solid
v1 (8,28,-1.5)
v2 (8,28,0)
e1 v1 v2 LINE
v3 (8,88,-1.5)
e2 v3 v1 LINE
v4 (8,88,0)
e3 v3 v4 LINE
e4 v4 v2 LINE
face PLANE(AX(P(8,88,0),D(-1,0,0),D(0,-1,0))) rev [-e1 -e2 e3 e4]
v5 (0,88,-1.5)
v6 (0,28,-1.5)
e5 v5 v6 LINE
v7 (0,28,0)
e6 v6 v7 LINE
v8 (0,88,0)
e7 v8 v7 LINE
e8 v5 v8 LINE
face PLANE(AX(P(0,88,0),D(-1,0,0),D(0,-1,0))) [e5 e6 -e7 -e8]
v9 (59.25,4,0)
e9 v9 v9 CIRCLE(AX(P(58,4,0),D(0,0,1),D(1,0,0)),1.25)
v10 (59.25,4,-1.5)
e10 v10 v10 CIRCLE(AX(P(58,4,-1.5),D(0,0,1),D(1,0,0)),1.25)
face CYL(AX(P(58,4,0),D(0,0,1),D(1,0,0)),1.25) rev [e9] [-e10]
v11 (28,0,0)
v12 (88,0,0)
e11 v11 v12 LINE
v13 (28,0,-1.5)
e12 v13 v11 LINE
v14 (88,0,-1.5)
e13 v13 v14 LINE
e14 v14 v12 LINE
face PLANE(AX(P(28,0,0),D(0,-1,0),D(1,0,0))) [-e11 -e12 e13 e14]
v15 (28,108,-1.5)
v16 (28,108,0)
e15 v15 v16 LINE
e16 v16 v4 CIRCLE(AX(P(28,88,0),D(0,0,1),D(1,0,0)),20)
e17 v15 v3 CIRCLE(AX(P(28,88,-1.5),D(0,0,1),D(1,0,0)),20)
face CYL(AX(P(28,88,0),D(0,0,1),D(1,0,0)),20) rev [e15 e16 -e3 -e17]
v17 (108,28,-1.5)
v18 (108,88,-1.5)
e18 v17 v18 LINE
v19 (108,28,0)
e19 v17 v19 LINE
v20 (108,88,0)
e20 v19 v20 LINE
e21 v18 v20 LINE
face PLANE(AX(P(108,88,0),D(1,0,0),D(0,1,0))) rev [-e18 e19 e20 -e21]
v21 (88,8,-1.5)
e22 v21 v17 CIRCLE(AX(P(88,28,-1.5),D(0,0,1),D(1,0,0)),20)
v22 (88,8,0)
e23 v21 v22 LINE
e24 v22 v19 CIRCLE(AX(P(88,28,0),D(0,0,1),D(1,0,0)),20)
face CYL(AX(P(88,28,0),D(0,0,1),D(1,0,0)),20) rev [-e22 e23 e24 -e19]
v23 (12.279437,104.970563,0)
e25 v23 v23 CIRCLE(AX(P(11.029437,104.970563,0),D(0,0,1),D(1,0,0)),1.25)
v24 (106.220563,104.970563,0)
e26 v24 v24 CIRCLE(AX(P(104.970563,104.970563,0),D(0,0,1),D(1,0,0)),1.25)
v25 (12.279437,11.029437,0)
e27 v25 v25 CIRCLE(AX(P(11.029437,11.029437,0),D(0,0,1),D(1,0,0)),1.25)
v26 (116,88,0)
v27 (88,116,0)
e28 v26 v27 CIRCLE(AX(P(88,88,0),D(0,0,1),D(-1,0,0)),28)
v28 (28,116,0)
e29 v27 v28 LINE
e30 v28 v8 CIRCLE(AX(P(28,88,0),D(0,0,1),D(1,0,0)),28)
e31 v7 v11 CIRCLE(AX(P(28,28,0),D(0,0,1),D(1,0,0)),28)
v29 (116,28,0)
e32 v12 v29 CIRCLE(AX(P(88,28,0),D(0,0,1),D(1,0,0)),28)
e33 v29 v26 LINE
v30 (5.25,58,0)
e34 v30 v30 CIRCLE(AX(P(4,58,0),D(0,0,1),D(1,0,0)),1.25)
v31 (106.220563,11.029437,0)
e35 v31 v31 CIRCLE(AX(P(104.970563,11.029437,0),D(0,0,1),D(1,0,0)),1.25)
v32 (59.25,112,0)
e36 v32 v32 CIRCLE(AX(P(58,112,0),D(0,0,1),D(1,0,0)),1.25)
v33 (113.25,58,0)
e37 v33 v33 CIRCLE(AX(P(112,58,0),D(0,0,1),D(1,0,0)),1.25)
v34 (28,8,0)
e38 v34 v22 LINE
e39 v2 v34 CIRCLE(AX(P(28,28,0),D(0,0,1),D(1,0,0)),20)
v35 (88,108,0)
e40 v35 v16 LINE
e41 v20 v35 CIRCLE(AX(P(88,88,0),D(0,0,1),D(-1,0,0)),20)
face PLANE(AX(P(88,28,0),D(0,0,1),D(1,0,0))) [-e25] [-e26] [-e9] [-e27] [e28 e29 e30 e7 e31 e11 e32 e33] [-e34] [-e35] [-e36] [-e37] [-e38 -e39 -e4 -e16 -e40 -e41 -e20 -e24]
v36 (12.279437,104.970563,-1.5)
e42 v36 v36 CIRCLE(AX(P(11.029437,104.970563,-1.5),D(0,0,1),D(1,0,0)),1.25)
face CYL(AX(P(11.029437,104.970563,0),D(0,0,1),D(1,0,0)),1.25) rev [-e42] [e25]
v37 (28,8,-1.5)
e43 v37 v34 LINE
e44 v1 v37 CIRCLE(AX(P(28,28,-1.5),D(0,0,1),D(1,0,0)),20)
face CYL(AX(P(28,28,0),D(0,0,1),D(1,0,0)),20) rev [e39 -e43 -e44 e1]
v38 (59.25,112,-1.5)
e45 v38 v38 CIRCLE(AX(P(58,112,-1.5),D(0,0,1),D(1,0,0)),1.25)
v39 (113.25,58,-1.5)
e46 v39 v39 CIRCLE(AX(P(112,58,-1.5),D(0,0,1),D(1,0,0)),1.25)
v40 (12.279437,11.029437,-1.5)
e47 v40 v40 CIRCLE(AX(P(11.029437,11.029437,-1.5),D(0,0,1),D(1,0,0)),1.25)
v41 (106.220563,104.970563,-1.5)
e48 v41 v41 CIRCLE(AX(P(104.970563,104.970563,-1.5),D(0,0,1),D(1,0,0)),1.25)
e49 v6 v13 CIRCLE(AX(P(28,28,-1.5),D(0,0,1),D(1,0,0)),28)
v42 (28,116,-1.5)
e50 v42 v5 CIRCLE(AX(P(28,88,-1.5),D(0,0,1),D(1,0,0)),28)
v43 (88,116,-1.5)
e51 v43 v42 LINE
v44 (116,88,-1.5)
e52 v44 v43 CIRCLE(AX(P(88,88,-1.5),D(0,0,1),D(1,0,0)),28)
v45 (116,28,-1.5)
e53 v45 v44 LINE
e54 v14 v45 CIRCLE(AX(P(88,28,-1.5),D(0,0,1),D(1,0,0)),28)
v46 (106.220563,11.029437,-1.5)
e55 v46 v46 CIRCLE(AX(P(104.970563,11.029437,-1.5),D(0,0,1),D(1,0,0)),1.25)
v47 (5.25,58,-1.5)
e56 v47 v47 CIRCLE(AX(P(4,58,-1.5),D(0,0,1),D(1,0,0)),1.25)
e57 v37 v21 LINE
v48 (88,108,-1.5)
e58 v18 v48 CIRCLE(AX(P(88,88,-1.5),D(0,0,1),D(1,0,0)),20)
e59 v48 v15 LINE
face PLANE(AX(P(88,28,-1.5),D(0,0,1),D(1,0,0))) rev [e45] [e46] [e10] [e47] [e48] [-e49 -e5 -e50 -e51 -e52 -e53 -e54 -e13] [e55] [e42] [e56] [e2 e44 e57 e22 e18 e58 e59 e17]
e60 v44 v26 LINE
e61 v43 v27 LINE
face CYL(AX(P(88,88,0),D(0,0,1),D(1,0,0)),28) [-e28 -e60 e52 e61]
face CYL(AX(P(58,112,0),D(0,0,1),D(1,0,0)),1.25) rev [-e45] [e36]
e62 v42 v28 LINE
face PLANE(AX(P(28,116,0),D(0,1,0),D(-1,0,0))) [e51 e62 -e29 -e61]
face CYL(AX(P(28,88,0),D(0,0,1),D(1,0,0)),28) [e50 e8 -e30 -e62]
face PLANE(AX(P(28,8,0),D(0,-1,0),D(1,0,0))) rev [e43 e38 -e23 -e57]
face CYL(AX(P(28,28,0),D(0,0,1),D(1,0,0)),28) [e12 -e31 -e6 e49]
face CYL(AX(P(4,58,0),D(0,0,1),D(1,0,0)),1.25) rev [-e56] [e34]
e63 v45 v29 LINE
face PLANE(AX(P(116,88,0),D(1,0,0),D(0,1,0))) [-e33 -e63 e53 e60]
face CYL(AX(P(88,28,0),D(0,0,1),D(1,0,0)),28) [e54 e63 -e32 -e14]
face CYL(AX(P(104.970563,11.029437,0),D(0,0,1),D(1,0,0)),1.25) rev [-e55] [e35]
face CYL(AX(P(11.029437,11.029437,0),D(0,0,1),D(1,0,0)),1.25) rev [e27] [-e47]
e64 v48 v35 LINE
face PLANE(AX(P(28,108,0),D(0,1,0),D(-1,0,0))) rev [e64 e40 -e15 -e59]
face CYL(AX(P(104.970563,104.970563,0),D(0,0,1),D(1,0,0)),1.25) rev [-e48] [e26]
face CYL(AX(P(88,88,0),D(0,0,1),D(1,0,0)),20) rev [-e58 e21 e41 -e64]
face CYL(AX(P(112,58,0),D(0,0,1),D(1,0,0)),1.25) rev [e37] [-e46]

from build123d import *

# Parameters (mm, degrees)
CONVERT_SOLID1_START     = -1.5
CONVERT_SOLID1_OUTLINE_R = 1.25
CONVERT_SOLID1_DEPTH     = 1.5


# Read off the part's stored shape, not the designer's step: Convert-Solid1
with BuildPart() as part:
    # Convert-Solid1 outline → Convert-Solid1 (new body)
    with BuildSketch(Plane.XY.offset(CONVERT_SOLID1_START)):
        with BuildLine():
            Line((116, 28), (116, 88))
            ThreePointArc((116, 88), (107.798989873, 107.798989873), (88, 116))
            Line((88, 116), (28, 116))
            ThreePointArc((28, 116), (8.201010127, 107.798989873), (0, 88))
            Line((0, 88), (0, 28))
            ThreePointArc((0, 28), (8.201010127, 8.201010127), (28, 0))
            Line((28, 0), (88, 0))
            ThreePointArc((88, 0), (107.798989873, 8.201010127), (116, 28))
        make_face()
        with Locations((11.029437252, 11.029437252)):
            Circle(CONVERT_SOLID1_OUTLINE_R, mode=Mode.SUBTRACT)
        with Locations((58, 4)):
            Circle(CONVERT_SOLID1_OUTLINE_R, mode=Mode.SUBTRACT)
        with Locations((104.970562748, 11.029437252)):
            Circle(CONVERT_SOLID1_OUTLINE_R, mode=Mode.SUBTRACT)
        with Locations((4, 58)):
            Circle(CONVERT_SOLID1_OUTLINE_R, mode=Mode.SUBTRACT)
        with Locations((11.029437252, 104.970562748)):
            Circle(CONVERT_SOLID1_OUTLINE_R, mode=Mode.SUBTRACT)
        with BuildLine():
            ThreePointArc((108, 28), (102.142135624, 13.857864376), (88, 8))
            Line((88, 8), (28, 8))
            ThreePointArc((28, 8), (13.857864376, 13.857864376), (8, 28))
            Line((8, 28), (8, 88))
            ThreePointArc((8, 88), (13.857864376, 102.142135624), (28, 108))
            Line((28, 108), (88, 108))
            ThreePointArc((88, 108), (102.142135624, 102.142135624), (108, 88))
            Line((108, 88), (108, 28))
        make_face(mode=Mode.SUBTRACT)
        with Locations((112, 58)):
            Circle(CONVERT_SOLID1_OUTLINE_R, mode=Mode.SUBTRACT)
        with Locations((58, 112)):
            Circle(CONVERT_SOLID1_OUTLINE_R, mode=Mode.SUBTRACT)
        with Locations((104.970562748, 104.970562748)):
            Circle(CONVERT_SOLID1_OUTLINE_R, mode=Mode.SUBTRACT)
    extrude(amount=CONVERT_SOLID1_DEPTH)


solid = part.part
